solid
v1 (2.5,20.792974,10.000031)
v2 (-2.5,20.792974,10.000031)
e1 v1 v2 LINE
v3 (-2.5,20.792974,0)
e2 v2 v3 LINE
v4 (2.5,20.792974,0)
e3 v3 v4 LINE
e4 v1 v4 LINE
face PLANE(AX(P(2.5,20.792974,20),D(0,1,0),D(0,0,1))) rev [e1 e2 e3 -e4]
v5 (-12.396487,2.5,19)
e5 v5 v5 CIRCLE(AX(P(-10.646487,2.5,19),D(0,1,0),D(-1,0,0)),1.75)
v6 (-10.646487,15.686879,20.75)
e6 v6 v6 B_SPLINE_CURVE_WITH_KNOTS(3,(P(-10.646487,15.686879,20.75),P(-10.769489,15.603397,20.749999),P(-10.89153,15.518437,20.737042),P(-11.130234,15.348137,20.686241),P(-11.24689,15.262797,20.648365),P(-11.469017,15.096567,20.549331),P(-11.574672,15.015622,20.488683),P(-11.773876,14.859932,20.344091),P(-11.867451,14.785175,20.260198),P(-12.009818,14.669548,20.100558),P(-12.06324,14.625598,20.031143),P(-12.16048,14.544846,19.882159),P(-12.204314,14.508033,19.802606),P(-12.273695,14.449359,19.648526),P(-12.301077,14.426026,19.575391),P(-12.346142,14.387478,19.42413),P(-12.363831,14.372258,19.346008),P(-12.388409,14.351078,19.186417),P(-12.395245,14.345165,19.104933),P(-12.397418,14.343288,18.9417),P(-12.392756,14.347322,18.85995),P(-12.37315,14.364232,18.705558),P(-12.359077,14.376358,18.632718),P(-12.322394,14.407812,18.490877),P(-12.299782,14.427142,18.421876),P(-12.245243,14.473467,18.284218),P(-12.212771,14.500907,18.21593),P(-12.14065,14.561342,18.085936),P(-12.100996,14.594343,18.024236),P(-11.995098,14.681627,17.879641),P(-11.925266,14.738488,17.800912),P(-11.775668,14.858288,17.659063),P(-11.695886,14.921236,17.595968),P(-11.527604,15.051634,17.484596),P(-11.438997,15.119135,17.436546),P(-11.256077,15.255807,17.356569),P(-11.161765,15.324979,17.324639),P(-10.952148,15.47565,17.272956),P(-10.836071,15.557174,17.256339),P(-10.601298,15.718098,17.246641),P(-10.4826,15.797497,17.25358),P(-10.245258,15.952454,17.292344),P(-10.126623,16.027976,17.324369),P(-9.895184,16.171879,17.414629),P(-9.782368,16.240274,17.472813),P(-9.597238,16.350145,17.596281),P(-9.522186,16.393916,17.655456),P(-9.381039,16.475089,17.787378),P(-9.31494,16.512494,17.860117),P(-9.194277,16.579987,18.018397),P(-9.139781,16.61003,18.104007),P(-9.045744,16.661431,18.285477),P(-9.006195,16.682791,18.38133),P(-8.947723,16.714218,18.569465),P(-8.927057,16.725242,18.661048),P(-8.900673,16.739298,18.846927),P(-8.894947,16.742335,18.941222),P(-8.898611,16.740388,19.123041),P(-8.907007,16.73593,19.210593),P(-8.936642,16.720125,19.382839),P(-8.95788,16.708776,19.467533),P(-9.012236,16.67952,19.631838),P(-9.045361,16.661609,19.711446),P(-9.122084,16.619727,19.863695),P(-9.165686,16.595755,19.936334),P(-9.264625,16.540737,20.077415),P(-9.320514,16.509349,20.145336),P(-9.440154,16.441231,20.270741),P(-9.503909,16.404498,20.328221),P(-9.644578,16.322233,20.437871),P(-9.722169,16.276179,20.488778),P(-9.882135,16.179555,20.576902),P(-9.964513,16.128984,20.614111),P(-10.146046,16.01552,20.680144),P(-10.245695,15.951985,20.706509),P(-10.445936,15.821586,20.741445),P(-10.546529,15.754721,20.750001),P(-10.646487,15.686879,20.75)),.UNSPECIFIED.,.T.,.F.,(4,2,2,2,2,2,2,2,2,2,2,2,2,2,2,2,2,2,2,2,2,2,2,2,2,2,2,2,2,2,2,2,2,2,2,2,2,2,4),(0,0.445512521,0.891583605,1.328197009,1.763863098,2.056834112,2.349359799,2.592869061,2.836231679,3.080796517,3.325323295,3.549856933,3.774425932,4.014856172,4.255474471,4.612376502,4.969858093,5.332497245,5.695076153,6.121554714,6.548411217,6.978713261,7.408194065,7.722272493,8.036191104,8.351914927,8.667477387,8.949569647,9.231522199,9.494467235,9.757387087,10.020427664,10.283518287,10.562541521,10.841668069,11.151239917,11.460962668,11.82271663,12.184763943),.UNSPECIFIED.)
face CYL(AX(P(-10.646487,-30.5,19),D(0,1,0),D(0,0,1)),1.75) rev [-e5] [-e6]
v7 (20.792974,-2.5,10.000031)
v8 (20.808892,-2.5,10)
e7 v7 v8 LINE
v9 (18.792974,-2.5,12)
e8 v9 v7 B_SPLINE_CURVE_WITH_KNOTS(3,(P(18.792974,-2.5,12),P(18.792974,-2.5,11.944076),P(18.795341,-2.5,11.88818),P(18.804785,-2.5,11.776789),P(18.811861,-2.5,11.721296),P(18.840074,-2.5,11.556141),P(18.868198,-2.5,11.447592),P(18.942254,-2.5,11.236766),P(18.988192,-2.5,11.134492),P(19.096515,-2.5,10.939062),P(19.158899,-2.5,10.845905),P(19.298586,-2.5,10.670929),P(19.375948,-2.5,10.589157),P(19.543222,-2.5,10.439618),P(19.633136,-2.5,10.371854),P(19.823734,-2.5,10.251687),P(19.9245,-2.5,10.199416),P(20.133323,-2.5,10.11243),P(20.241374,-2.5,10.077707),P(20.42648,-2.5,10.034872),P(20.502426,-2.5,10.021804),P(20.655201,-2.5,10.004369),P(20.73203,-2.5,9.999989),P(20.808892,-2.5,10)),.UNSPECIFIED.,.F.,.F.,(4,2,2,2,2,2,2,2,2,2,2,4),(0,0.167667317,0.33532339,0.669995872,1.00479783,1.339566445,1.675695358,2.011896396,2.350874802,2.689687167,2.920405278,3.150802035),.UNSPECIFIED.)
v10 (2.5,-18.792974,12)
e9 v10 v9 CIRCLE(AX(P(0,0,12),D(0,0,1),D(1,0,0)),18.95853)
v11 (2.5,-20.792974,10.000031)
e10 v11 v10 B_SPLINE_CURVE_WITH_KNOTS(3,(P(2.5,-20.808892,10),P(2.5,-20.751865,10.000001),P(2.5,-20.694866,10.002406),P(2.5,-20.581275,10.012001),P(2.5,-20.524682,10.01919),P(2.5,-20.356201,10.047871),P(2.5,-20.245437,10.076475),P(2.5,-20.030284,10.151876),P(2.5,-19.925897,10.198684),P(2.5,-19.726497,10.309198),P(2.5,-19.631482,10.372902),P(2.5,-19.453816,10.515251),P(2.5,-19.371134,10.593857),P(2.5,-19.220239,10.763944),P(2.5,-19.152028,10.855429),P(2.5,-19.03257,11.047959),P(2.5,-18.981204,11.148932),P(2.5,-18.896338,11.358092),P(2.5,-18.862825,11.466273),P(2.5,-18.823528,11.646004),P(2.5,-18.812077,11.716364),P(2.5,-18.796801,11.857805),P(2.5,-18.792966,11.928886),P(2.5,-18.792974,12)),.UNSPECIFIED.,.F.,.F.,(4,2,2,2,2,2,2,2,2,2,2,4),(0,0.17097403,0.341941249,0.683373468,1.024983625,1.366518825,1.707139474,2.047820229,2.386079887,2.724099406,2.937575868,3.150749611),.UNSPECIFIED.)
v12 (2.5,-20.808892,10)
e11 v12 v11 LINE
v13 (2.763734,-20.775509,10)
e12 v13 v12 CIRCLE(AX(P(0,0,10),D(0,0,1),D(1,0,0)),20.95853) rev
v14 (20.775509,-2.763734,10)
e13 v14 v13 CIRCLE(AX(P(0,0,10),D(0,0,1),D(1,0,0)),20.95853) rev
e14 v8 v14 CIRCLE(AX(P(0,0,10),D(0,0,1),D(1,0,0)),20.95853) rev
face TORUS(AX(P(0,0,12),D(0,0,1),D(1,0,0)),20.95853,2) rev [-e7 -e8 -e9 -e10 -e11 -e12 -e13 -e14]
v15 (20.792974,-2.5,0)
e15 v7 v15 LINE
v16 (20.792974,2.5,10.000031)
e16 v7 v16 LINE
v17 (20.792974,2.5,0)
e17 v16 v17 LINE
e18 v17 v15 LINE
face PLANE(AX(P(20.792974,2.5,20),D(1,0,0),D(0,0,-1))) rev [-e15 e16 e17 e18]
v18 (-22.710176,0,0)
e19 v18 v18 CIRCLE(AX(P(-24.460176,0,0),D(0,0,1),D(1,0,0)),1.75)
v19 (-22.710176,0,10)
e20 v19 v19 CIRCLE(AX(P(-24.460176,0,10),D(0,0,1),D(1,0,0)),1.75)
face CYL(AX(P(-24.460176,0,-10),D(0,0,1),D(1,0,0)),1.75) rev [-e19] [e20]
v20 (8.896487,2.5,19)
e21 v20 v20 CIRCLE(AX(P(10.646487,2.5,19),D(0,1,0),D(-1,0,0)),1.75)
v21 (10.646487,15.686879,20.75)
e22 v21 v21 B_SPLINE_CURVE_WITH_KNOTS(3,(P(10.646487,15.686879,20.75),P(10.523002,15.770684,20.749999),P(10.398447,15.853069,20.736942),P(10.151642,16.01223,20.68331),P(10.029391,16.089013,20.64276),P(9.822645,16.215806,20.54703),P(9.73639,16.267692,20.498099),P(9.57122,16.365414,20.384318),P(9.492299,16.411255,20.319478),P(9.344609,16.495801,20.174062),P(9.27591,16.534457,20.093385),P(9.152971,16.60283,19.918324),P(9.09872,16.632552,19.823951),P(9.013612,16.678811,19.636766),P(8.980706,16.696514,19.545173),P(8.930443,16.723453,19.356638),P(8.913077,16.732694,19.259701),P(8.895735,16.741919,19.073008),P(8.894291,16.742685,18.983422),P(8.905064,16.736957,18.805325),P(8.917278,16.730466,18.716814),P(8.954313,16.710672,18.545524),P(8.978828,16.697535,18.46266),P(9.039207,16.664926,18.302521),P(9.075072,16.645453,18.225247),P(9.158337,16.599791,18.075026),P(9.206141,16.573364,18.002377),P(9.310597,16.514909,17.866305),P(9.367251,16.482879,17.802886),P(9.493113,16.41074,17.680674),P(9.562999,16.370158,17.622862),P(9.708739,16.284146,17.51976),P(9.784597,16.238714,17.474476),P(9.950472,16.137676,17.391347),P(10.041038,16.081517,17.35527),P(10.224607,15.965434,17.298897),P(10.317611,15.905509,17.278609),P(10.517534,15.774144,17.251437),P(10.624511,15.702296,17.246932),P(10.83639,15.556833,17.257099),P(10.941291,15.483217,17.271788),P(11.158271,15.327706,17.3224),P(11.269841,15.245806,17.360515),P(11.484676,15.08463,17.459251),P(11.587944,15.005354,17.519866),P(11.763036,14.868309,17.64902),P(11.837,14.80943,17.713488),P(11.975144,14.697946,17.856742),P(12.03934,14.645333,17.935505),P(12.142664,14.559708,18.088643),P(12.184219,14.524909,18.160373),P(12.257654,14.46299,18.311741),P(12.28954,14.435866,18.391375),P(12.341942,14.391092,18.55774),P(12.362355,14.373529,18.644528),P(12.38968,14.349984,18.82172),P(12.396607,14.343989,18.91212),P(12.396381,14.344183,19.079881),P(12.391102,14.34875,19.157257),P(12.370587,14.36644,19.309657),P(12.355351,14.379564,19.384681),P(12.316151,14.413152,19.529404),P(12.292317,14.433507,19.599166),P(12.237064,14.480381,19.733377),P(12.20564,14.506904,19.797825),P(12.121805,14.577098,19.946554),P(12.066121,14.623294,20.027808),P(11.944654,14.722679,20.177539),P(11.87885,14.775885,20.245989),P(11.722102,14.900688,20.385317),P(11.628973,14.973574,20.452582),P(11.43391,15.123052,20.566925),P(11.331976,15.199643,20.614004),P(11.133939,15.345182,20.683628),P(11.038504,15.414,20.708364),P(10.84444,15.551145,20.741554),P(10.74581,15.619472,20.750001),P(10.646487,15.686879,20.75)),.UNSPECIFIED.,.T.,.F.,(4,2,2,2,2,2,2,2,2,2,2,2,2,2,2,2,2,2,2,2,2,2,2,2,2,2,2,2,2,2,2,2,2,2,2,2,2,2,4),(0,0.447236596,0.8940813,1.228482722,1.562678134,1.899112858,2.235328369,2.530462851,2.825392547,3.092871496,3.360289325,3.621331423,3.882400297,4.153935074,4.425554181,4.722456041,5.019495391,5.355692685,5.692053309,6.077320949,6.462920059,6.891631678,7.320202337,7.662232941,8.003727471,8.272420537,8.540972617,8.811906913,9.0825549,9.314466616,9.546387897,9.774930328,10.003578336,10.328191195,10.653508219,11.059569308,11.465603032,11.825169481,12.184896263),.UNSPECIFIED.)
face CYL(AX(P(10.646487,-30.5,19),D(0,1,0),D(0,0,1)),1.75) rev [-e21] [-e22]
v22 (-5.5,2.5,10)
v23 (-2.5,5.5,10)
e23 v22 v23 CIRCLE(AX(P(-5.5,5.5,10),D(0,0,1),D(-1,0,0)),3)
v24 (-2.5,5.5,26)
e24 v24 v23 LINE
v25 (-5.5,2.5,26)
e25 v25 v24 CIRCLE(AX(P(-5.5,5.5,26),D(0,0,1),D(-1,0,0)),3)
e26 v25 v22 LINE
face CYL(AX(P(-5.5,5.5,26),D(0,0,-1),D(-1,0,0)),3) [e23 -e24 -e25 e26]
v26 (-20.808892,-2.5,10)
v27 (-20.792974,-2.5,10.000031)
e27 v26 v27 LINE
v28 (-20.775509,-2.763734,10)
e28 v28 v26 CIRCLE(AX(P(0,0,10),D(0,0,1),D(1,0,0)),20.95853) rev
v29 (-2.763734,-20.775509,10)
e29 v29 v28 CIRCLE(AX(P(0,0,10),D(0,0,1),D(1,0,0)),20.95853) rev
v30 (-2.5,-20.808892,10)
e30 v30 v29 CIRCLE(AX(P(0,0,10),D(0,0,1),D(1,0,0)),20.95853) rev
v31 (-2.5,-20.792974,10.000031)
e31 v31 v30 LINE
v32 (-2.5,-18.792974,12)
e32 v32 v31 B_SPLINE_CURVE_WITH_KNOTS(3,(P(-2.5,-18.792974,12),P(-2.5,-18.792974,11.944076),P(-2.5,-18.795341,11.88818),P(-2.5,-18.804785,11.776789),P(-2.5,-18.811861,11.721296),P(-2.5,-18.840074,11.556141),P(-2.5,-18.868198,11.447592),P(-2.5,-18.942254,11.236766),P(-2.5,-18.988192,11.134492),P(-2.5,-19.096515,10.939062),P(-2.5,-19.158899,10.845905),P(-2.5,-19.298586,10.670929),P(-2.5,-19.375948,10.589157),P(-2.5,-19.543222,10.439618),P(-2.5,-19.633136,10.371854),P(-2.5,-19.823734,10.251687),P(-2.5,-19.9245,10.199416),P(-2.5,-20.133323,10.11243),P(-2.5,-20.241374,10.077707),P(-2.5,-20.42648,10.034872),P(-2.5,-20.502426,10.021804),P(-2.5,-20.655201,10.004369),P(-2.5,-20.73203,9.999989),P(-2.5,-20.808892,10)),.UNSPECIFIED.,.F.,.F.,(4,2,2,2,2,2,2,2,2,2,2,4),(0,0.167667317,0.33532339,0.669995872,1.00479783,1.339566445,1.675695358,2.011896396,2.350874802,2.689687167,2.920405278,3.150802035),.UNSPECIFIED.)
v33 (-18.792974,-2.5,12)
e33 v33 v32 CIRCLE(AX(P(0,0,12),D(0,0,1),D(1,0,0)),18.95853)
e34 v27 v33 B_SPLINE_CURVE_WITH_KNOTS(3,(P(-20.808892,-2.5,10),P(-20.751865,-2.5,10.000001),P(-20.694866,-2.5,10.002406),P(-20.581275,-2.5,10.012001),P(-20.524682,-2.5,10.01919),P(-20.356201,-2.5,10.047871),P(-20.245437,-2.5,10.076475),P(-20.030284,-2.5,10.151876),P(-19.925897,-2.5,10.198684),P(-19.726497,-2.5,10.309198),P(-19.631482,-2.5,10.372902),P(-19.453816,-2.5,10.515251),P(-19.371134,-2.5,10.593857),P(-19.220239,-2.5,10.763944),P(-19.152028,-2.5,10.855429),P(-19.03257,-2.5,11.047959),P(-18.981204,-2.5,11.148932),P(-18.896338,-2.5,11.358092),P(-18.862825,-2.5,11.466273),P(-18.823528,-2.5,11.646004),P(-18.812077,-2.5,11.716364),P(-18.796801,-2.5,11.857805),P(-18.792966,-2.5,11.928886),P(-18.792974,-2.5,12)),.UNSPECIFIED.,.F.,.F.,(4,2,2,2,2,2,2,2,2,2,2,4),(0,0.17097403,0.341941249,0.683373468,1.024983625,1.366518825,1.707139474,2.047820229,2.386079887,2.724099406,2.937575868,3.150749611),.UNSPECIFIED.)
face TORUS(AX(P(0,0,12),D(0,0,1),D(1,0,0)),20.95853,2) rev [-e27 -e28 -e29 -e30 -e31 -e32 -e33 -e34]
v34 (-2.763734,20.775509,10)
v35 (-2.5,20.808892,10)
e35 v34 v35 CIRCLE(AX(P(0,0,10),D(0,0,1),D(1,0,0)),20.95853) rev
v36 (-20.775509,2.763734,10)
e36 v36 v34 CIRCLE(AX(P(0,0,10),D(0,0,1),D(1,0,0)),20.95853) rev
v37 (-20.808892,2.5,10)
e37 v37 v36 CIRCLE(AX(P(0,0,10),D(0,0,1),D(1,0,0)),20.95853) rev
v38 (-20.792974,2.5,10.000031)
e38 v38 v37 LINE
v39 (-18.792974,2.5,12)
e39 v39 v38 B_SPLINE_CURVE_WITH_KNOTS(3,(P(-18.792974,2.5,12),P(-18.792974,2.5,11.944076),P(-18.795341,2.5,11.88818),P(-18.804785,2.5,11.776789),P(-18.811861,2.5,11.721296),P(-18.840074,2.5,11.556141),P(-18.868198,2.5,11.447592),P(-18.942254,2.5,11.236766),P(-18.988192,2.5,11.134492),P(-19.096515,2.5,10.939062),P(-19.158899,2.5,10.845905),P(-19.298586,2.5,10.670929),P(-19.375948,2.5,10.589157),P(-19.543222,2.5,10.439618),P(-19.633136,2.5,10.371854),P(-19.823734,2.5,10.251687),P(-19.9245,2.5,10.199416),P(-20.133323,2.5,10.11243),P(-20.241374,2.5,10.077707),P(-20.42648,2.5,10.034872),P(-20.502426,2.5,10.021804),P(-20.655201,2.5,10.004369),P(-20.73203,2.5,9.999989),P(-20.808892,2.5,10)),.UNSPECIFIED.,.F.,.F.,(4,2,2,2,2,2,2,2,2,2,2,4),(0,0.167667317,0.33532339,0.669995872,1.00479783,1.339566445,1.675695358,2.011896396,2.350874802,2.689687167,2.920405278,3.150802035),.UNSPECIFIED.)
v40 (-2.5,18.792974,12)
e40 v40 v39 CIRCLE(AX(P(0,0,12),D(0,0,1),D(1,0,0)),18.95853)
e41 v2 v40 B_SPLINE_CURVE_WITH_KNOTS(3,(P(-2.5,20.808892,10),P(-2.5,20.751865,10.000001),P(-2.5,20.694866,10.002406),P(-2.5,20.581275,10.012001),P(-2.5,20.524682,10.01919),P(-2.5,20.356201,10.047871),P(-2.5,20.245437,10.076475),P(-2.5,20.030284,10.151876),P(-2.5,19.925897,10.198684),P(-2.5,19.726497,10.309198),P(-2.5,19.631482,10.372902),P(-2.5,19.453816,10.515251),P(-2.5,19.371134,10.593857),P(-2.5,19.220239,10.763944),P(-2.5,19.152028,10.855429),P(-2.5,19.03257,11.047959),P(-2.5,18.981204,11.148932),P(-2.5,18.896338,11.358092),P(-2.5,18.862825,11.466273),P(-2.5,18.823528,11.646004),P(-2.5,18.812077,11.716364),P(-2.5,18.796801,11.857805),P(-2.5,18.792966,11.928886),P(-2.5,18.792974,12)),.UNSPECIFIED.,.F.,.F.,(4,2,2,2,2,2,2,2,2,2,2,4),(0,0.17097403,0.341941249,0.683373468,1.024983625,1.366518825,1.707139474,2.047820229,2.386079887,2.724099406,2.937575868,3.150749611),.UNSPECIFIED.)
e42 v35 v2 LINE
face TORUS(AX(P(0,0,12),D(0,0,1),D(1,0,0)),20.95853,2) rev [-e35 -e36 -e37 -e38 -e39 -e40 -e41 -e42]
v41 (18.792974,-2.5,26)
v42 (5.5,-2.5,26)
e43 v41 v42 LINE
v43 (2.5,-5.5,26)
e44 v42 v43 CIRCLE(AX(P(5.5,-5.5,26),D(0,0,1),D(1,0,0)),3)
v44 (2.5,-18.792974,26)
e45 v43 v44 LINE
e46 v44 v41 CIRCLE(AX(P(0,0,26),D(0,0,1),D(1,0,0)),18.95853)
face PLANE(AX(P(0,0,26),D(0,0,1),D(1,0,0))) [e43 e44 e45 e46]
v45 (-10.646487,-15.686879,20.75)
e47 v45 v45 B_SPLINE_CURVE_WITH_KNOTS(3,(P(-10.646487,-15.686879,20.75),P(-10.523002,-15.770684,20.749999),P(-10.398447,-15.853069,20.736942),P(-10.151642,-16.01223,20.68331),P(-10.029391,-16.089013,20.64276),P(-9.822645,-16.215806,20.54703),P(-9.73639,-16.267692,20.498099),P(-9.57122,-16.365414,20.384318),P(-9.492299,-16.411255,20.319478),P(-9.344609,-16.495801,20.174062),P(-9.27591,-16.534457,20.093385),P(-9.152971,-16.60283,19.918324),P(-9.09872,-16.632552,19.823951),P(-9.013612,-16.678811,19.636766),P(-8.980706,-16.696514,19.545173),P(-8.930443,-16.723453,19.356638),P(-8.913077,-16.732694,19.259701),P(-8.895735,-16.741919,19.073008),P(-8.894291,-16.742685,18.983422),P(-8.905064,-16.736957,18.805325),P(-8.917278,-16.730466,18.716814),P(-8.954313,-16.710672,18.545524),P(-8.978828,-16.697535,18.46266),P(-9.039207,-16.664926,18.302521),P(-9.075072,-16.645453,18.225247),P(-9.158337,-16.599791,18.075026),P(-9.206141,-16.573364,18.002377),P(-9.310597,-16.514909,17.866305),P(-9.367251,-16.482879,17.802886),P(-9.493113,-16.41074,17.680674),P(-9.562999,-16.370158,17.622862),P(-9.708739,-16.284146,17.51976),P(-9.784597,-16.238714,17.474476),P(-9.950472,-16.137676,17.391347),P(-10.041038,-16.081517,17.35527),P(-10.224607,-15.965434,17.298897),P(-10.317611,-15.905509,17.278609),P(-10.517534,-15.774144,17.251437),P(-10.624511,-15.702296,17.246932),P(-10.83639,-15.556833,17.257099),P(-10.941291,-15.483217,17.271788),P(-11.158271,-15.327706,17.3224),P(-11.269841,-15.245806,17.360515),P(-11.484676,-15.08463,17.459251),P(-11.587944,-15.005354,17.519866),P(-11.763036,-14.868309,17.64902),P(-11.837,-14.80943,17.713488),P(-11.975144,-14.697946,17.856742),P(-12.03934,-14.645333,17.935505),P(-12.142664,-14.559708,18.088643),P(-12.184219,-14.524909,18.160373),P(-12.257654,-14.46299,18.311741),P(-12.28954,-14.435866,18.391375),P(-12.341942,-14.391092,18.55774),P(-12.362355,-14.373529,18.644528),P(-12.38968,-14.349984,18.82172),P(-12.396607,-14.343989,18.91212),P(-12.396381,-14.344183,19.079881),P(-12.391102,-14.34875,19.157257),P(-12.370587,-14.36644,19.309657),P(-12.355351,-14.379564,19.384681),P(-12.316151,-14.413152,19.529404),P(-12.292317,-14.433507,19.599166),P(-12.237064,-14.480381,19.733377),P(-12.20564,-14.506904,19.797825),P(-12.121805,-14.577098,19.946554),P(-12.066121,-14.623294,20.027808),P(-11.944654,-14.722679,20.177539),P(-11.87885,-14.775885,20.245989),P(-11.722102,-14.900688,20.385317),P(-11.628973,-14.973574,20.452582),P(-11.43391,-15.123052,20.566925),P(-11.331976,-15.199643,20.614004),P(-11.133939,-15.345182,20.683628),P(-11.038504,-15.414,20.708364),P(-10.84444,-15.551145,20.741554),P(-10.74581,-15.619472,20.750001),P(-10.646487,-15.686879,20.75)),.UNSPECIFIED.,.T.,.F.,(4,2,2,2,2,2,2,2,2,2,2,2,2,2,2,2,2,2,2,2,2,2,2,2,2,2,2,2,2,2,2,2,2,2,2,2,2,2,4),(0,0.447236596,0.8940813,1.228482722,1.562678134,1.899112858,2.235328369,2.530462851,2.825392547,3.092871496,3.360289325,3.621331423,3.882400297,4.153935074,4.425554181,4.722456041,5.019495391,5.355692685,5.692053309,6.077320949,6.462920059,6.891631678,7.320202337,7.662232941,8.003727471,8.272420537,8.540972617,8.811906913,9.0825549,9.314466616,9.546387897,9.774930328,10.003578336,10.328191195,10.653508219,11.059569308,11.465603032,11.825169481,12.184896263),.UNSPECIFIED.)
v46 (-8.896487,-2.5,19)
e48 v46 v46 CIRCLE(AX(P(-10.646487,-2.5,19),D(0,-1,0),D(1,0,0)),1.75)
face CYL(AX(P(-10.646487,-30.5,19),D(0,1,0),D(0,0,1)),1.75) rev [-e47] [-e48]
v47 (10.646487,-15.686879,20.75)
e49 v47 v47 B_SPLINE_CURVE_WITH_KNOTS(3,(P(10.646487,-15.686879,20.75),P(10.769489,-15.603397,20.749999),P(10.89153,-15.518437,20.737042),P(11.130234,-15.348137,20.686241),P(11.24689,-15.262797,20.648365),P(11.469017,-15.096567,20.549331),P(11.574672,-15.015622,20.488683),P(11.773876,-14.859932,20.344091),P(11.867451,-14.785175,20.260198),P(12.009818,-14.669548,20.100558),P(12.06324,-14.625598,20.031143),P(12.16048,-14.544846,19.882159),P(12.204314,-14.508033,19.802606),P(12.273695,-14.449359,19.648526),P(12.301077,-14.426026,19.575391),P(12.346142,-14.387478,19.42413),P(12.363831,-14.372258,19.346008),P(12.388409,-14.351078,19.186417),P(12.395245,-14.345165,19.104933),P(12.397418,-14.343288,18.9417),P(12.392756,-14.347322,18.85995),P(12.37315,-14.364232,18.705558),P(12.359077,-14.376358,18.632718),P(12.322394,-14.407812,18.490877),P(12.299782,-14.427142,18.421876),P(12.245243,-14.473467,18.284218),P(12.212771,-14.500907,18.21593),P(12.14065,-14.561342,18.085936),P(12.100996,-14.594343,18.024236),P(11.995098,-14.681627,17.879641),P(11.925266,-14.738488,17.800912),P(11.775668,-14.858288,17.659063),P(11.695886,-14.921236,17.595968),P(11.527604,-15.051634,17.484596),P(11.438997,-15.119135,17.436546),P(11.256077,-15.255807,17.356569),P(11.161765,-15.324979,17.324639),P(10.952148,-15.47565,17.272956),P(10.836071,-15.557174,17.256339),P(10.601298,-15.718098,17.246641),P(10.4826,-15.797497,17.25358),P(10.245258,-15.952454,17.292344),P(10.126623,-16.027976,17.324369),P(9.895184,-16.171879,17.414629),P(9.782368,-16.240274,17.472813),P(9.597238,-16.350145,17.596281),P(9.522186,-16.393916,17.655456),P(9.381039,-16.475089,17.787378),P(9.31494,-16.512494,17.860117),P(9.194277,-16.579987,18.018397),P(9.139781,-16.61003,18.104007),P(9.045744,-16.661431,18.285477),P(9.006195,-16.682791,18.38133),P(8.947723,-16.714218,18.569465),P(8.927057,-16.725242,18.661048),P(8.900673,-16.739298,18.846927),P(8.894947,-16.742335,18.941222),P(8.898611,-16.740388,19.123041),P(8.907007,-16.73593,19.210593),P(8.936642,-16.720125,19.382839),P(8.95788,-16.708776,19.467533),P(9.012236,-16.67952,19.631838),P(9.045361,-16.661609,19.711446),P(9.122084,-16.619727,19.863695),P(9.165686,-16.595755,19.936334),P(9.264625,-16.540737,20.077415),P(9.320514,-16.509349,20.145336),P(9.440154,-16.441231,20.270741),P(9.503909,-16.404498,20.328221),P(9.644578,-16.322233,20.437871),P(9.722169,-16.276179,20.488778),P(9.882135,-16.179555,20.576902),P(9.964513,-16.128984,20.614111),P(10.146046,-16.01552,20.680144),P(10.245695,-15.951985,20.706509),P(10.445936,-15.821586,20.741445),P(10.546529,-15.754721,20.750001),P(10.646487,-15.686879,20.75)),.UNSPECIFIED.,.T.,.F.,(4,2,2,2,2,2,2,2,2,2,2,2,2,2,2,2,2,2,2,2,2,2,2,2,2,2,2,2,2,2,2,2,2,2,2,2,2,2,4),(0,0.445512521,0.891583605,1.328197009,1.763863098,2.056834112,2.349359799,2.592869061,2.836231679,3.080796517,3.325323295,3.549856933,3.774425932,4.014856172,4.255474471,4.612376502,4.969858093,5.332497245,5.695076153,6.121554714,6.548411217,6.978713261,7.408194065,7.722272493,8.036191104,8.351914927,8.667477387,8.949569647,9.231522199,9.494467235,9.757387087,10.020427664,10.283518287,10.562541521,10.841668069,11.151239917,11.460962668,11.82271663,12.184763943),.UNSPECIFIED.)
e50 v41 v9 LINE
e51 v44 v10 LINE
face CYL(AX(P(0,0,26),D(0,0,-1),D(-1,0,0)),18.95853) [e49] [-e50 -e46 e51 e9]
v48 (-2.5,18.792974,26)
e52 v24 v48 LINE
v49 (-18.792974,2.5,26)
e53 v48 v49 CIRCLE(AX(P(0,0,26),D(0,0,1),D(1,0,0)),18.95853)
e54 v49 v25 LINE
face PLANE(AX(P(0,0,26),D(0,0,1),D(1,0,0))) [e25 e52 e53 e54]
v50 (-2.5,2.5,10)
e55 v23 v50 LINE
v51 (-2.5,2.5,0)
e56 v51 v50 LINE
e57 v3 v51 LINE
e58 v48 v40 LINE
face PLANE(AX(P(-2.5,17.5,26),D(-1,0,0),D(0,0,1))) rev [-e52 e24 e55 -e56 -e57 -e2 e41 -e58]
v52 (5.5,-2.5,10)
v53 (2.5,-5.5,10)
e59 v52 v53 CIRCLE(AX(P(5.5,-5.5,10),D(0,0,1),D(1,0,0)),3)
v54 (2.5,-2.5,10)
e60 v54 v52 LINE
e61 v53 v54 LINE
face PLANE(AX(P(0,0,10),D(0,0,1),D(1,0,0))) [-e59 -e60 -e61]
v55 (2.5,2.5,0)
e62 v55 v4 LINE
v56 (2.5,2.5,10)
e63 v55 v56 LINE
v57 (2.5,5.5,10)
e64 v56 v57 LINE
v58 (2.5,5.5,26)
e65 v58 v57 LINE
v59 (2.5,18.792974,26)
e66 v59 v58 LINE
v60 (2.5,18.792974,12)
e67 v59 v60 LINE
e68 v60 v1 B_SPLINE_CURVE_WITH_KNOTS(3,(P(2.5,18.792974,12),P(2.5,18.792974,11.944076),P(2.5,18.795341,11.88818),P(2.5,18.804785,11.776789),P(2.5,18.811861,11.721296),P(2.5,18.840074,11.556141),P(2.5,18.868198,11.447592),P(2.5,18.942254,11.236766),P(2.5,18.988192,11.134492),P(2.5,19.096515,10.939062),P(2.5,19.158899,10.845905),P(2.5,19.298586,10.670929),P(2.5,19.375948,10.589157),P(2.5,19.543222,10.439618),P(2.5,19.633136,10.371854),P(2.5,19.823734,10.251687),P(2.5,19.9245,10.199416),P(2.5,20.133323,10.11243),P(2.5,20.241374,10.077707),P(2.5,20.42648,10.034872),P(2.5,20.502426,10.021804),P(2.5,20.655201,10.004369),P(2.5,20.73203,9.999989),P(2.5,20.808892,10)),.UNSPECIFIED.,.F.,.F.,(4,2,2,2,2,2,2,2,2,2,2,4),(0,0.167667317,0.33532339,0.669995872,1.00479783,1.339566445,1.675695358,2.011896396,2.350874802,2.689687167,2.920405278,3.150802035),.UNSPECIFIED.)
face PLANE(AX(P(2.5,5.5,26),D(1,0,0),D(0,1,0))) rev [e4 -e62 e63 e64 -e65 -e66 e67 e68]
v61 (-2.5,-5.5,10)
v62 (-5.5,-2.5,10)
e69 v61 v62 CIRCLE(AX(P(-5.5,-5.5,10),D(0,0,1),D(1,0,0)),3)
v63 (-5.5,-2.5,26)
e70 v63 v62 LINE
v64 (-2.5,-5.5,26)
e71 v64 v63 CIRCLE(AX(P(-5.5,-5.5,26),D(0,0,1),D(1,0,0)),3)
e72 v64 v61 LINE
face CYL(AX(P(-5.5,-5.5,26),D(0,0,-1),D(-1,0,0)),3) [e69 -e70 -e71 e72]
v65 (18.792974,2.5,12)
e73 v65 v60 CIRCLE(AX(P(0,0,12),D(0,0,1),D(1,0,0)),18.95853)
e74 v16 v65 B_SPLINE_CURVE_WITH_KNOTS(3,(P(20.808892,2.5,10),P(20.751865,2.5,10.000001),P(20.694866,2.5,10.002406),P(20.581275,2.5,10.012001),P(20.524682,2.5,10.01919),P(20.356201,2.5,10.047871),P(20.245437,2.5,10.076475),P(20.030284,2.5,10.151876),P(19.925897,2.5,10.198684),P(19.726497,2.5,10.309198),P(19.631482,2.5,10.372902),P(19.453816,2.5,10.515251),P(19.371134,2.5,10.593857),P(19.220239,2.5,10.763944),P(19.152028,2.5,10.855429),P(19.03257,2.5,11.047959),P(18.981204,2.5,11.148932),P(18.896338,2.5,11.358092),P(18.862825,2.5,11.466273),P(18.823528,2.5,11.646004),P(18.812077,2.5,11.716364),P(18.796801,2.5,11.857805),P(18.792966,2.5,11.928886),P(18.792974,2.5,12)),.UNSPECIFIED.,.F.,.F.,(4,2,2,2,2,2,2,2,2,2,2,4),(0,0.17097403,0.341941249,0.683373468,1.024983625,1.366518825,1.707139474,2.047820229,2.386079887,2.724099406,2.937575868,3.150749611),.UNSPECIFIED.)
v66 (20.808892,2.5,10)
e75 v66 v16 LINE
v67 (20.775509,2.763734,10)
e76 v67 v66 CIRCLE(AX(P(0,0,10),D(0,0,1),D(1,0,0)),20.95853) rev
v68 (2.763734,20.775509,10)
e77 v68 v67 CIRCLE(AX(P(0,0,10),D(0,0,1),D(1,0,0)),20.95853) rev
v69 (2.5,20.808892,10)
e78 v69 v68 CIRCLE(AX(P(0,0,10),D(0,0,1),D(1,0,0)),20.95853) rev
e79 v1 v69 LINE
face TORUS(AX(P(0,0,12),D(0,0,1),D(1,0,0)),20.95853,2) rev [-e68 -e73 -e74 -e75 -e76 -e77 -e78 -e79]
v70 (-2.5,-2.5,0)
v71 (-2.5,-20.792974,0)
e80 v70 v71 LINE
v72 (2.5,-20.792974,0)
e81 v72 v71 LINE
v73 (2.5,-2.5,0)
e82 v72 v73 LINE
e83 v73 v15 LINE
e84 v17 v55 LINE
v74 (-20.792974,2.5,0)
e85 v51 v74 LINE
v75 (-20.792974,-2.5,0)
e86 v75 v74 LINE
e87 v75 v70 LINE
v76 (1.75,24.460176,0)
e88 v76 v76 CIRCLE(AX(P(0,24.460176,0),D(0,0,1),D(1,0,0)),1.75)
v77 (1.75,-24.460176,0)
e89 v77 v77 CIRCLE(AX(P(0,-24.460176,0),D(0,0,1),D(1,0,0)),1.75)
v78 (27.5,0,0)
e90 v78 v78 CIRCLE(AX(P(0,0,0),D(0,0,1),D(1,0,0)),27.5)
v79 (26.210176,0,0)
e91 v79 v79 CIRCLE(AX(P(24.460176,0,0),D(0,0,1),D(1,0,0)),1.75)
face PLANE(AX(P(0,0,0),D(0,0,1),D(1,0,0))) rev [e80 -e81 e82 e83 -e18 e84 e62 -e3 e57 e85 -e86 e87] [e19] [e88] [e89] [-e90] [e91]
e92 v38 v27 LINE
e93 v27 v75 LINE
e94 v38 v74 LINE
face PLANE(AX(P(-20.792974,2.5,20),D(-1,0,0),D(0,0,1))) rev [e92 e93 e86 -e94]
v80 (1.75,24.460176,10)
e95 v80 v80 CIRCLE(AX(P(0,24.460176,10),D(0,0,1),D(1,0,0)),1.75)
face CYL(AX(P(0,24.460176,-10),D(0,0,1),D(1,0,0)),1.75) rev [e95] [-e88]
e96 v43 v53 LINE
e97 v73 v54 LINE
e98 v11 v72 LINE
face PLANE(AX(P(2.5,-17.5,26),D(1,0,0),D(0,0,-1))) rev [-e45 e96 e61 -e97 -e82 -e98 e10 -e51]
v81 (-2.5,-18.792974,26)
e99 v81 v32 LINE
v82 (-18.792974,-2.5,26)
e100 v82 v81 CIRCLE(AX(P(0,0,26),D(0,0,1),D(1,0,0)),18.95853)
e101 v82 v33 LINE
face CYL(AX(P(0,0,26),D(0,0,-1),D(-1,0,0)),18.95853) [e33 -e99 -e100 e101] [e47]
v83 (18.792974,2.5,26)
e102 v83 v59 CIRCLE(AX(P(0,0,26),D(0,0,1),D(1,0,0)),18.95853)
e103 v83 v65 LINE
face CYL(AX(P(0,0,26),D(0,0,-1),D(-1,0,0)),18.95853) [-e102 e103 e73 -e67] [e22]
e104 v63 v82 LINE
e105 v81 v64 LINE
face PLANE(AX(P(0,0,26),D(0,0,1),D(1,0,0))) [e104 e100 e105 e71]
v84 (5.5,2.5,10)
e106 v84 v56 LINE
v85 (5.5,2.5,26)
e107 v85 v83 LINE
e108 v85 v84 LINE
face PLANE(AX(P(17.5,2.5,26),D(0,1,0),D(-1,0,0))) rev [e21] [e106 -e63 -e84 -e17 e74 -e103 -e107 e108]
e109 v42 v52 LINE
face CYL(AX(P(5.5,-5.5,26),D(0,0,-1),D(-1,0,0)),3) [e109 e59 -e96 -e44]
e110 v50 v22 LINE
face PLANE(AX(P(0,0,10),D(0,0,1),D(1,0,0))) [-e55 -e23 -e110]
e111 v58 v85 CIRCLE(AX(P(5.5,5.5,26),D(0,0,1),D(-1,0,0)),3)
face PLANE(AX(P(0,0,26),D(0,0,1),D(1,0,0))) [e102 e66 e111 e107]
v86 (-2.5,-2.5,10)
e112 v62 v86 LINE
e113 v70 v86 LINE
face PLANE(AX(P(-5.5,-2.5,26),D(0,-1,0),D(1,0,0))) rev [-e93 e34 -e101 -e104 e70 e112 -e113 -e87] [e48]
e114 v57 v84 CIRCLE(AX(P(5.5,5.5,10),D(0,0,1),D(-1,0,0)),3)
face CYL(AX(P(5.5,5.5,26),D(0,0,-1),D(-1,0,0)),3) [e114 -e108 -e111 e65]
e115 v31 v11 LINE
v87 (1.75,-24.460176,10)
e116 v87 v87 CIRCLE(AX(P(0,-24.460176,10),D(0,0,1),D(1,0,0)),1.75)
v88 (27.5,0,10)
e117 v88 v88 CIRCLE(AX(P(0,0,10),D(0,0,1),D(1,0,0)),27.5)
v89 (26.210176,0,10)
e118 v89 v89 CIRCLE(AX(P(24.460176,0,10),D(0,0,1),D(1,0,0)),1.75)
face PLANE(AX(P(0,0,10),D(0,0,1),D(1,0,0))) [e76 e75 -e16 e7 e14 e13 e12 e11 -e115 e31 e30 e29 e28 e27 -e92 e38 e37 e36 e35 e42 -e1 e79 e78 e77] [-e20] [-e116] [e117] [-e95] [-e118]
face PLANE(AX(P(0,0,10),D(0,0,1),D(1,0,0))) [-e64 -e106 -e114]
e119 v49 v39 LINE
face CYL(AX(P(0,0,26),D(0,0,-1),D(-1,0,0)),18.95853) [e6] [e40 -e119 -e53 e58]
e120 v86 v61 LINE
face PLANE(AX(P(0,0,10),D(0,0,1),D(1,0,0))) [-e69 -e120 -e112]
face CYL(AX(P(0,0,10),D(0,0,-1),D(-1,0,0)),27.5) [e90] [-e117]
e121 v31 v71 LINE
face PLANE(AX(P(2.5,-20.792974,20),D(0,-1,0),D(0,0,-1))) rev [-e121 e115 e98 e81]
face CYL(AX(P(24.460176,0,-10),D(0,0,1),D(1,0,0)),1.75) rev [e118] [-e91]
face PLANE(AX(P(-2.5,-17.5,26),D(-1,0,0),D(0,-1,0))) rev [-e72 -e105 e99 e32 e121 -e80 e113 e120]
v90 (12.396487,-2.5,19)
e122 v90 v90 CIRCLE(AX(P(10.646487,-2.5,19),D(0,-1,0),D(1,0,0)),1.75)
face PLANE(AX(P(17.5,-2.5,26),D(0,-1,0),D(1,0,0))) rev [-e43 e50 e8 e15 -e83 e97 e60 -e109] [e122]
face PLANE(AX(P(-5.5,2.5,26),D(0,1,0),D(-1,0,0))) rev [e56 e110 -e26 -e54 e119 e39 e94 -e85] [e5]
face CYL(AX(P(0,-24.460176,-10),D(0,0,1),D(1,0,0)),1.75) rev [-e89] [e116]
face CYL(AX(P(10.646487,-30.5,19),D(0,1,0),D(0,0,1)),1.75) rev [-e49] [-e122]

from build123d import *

# Parameters (mm, degrees)
SKETCH_1_R          = 27.5
EXTRUDE_1_DEPTH     = 10
EXTRUDE_2_DEPTH     = 16
CUT_EXTRUDE_3_DEPTH = 20
FILLET_3_R          = 2
SKETCH_7_W          = 2
SKETCH_7_H          = 5
SKETCH_7_W_2        = 5
SKETCH_7_H_2        = 2
CUT_EXTRUDE_4_DEPTH = 20
SKETCH_8_R          = 1.75
CUT_EXTRUDE_5_DEPTH = 20
SKETCH_9_R          = 1.75
CUT_EXTRUDE_6_DEPTH = 30.5


with BuildPart() as part:
    # 草图1 → 凸台-拉伸1 (new body)
    with BuildSketch(Plane.XY):
        Circle(SKETCH_1_R)
    extrude(amount=EXTRUDE_1_DEPTH)

    # 草图2 → 凸台-拉伸2 (add)
    with BuildSketch(Plane.XY.offset(10)):
        with BuildLine():
            Line((-2.5, 5.5), (-2.5, 17.5))
            Line((-2.5, 17.5), (-2.5, 18.792973669))
            ThreePointArc((-2.5, 18.792973669), (-13.405705116, 13.405705116), (-18.792973669, 2.5))
            Line((-18.792973669, 2.5), (-17.5, 2.5))
            Line((-17.5, 2.5), (-5.5, 2.5))
            ThreePointArc((-5.5, 2.5), (-3.378679656, 3.378679656), (-2.5, 5.5))
        make_face()
        with BuildLine():
            Line((17.5, -2.5), (5.5, -2.5))
            ThreePointArc((5.5, -2.5), (3.378679656, -3.378679656), (2.5, -5.5))
            Line((2.5, -5.5), (2.5, -17.5))
            Line((2.5, -17.5), (2.5, -18.792973669))
            ThreePointArc((2.5, -18.792973669), (13.405705116, -13.405705116), (18.792973669, -2.5))
            Line((18.792973669, -2.5), (17.5, -2.5))
        make_face()
        with BuildLine():
            Line((17.5, 2.5), (5.5, 2.5))
            ThreePointArc((5.5, 2.5), (3.378679656, 3.378679656), (2.5, 5.5))
            Line((2.5, 5.5), (2.5, 17.5))
            Line((2.5, 17.5), (2.5, 18.792973669))
            ThreePointArc((2.5, 18.792973669), (13.405705116, 13.405705116), (18.792973669, 2.5))
            Line((18.792973669, 2.5), (17.5, 2.5))
        make_face()
        with BuildLine():
            Line((-2.5, -17.5), (-2.5, -5.5))
            ThreePointArc((-2.5, -5.5), (-3.378679656, -3.378679656), (-5.5, -2.5))
            Line((-5.5, -2.5), (-17.5, -2.5))
            Line((-17.5, -2.5), (-18.792973669, -2.5))
            ThreePointArc((-18.792973669, -2.5), (-13.405705116, -13.405705116), (-2.5, -18.792973669))
            Line((-2.5, -18.792973669), (-2.5, -17.5))
        make_face()
    extrude(amount=EXTRUDE_2_DEPTH)

    # 草图6 → 切除-拉伸3 (cut)
    with BuildSketch(Plane.XY.offset(10)):
        Polygon((18.792973669, -2.5), (5.5, -2.5), (2.5, -2.5), (2.5, -5.5), (2.5, -18.792973669), (-2.5, -18.792973669), (-2.5, -5.5), (-2.5, -2.5), (-5.5, -2.5), (-18.792973669, -2.5), (-18.792973669, 2.5), (-5.5, 2.5), (-2.5, 2.5), (-2.5, 5.5), (-2.5, 18.792973669), (2.5, 18.792973669), (2.5, 5.5), (2.5, 2.5), (5.5, 2.5), (18.792973669, 2.5), align=None)
    extrude(amount=-CUT_EXTRUDE_3_DEPTH, mode=Mode.SUBTRACT)

    # 圆角3
    # the kernel refuses this fillet: 2 mm, written as the material it adds along each edge
    with BuildSketch(Plane(origin=(0, 0, 10), x_dir=(-0.13117570134694587, -0.9913591354177037, 0), z_dir=(-0.9913591354177037, 0.13117570134694587, 0))) as fillet_3_piece_1_section:
        with BuildLine():
            CenterArc((18.958529988 + FILLET_3_R, FILLET_3_R), FILLET_3_R, 180, 90)
            Line((18.958529988, FILLET_3_R), (18.958529988, 0))
            Line((18.958529988, 0), (18.958529988 + FILLET_3_R, 0))
        make_face()
    fillet_3_piece_1 = revolve(axis=Axis((0, 0, 10), (0, 0, 1)), revolution_arc=105.075073745, mode=Mode.PRIVATE)
    fillet_3_piece_1 = split(fillet_3_piece_1, bisect_by=Plane(origin=(2.5, -19.248904349, 10.242638579), z_dir=(1, 0, 0)), keep=Keep.TOP, mode=Mode.PRIVATE)
    fillet_3_piece_1 = split(fillet_3_piece_1, bisect_by=Plane(origin=(4.206837789, -2.5, 10.242638579), z_dir=(0, -1, 0)), keep=Keep.TOP, mode=Mode.PRIVATE)
    add(fillet_3_piece_1)
    with BuildSketch(Plane(origin=(0, 0, 10), x_dir=(-0.13117570134694623, 0.9913591354177035, 0), z_dir=(-0.9913591354177035, -0.13117570134694623, 0))) as fillet_3_piece_2_section:
        with BuildLine():
            CenterArc((18.958529988 + FILLET_3_R, -FILLET_3_R), FILLET_3_R, 90, 90)
            Line((18.958529988, -FILLET_3_R), (18.958529988, 0))
            Line((18.958529988, 0), (18.958529988 + FILLET_3_R, 0))
        make_face()
    fillet_3_piece_2 = revolve(axis=Axis((0, 0, 10), (0, 0, -1)), revolution_arc=105.075073745, mode=Mode.PRIVATE)
    fillet_3_piece_2 = split(fillet_3_piece_2, bisect_by=Plane(origin=(4.206838505, 2.5, 10.242637951), z_dir=(0, 1, 0)), keep=Keep.TOP, mode=Mode.PRIVATE)
    fillet_3_piece_2 = split(fillet_3_piece_2, bisect_by=Plane(origin=(2.5, 19.24890412, 10.242637951), z_dir=(1, 0, 0)), keep=Keep.TOP, mode=Mode.PRIVATE)
    add(fillet_3_piece_2)
    with BuildSketch(Plane(origin=(0, 0, 10), x_dir=(-0.9913591354177035, 0.13117570134694678, 0), z_dir=(0.13117570134694678, 0.9913591354177035, 0))) as fillet_3_piece_3_section:
        with BuildLine():
            CenterArc((18.958529988 + FILLET_3_R, FILLET_3_R), FILLET_3_R, 180, 90)
            Line((18.958529988, FILLET_3_R), (18.958529988, 0))
            Line((18.958529988, 0), (18.958529988 + FILLET_3_R, 0))
        make_face()
    fillet_3_piece_3 = revolve(axis=Axis((0, 0, 10), (0, 0, 1)), revolution_arc=105.075073745, mode=Mode.PRIVATE)
    fillet_3_piece_3 = split(fillet_3_piece_3, bisect_by=Plane(origin=(-19.248904349, -2.5, 10.242638579), z_dir=(0, -1, 0)), keep=Keep.TOP, mode=Mode.PRIVATE)
    fillet_3_piece_3 = split(fillet_3_piece_3, bisect_by=Plane(origin=(-2.5, -4.206837789, 10.242638579), z_dir=(-1, 0, 0)), keep=Keep.TOP, mode=Mode.PRIVATE)
    add(fillet_3_piece_3)
    with BuildSketch(Plane(origin=(0, 0, 10), x_dir=(0.13117570134694595, 0.9913591354177037, 0), z_dir=(0.9913591354177037, -0.13117570134694595, 0))) as fillet_3_piece_4_section:
        with BuildLine():
            CenterArc((18.958529988 + FILLET_3_R, FILLET_3_R), FILLET_3_R, 180, 90)
            Line((18.958529988, FILLET_3_R), (18.958529988, 0))
            Line((18.958529988, 0), (18.958529988 + FILLET_3_R, 0))
        make_face()
    fillet_3_piece_4 = revolve(axis=Axis((0, 0, 10), (0, 0, 1)), revolution_arc=105.075073745, mode=Mode.PRIVATE)
    fillet_3_piece_4 = split(fillet_3_piece_4, bisect_by=Plane(origin=(-2.5, 19.248904349, 10.242638579), z_dir=(-1, 0, 0)), keep=Keep.TOP, mode=Mode.PRIVATE)
    fillet_3_piece_4 = split(fillet_3_piece_4, bisect_by=Plane(origin=(-4.206837789, 2.5, 10.242638579), z_dir=(0, 1, 0)), keep=Keep.TOP, mode=Mode.PRIVATE)
    add(fillet_3_piece_4)

    # 草图7 → 切除-拉伸4 (cut)
    with BuildSketch(Plane(origin=(0, 0, 0), x_dir=(-1, 0, 0), z_dir=(0, 0, -1))):
        with Locations((19.792973669, 0)):
            Rectangle(SKETCH_7_W, SKETCH_7_H)
        with Locations((0, -19.792973669)):
            Rectangle(SKETCH_7_W_2, SKETCH_7_H_2)
        with Locations((-19.792973669, 0)):
            Rectangle(SKETCH_7_W, SKETCH_7_H)
        with Locations((0, 19.792973669)):
            Rectangle(SKETCH_7_W_2, SKETCH_7_H_2)
    extrude(amount=-CUT_EXTRUDE_4_DEPTH, mode=Mode.SUBTRACT)

    # 草图8 → 切除-拉伸5 (cut)
    with BuildSketch(Plane.XY.offset(10)):
        with Locations((0, 24.460175936)):
            Circle(SKETCH_8_R)
        with Locations((24.460175936, 0)):
            Circle(SKETCH_8_R)
        with Locations((0, -24.460175936)):
            Circle(SKETCH_8_R)
        with Locations((-24.460175936, 0)):
            Circle(SKETCH_8_R)
    extrude(amount=-CUT_EXTRUDE_5_DEPTH, mode=Mode.SUBTRACT)

    # 草图9 → 切除-拉伸6 (cut, symmetric)
    with BuildSketch(Plane(origin=(0, 0, 0), x_dir=(1, 0, 0), z_dir=(0, 1, 0))):
        with Locations(Location((-10.646486834, -19, 0), (0, 0, 270))):
            Circle(SKETCH_9_R)
        with Locations(Location((10.646486834, -19, 0), (0, 0, 270))):
            Circle(SKETCH_9_R)
    extrude(amount=CUT_EXTRUDE_6_DEPTH, both=True, mode=Mode.SUBTRACT)


solid = part.part
